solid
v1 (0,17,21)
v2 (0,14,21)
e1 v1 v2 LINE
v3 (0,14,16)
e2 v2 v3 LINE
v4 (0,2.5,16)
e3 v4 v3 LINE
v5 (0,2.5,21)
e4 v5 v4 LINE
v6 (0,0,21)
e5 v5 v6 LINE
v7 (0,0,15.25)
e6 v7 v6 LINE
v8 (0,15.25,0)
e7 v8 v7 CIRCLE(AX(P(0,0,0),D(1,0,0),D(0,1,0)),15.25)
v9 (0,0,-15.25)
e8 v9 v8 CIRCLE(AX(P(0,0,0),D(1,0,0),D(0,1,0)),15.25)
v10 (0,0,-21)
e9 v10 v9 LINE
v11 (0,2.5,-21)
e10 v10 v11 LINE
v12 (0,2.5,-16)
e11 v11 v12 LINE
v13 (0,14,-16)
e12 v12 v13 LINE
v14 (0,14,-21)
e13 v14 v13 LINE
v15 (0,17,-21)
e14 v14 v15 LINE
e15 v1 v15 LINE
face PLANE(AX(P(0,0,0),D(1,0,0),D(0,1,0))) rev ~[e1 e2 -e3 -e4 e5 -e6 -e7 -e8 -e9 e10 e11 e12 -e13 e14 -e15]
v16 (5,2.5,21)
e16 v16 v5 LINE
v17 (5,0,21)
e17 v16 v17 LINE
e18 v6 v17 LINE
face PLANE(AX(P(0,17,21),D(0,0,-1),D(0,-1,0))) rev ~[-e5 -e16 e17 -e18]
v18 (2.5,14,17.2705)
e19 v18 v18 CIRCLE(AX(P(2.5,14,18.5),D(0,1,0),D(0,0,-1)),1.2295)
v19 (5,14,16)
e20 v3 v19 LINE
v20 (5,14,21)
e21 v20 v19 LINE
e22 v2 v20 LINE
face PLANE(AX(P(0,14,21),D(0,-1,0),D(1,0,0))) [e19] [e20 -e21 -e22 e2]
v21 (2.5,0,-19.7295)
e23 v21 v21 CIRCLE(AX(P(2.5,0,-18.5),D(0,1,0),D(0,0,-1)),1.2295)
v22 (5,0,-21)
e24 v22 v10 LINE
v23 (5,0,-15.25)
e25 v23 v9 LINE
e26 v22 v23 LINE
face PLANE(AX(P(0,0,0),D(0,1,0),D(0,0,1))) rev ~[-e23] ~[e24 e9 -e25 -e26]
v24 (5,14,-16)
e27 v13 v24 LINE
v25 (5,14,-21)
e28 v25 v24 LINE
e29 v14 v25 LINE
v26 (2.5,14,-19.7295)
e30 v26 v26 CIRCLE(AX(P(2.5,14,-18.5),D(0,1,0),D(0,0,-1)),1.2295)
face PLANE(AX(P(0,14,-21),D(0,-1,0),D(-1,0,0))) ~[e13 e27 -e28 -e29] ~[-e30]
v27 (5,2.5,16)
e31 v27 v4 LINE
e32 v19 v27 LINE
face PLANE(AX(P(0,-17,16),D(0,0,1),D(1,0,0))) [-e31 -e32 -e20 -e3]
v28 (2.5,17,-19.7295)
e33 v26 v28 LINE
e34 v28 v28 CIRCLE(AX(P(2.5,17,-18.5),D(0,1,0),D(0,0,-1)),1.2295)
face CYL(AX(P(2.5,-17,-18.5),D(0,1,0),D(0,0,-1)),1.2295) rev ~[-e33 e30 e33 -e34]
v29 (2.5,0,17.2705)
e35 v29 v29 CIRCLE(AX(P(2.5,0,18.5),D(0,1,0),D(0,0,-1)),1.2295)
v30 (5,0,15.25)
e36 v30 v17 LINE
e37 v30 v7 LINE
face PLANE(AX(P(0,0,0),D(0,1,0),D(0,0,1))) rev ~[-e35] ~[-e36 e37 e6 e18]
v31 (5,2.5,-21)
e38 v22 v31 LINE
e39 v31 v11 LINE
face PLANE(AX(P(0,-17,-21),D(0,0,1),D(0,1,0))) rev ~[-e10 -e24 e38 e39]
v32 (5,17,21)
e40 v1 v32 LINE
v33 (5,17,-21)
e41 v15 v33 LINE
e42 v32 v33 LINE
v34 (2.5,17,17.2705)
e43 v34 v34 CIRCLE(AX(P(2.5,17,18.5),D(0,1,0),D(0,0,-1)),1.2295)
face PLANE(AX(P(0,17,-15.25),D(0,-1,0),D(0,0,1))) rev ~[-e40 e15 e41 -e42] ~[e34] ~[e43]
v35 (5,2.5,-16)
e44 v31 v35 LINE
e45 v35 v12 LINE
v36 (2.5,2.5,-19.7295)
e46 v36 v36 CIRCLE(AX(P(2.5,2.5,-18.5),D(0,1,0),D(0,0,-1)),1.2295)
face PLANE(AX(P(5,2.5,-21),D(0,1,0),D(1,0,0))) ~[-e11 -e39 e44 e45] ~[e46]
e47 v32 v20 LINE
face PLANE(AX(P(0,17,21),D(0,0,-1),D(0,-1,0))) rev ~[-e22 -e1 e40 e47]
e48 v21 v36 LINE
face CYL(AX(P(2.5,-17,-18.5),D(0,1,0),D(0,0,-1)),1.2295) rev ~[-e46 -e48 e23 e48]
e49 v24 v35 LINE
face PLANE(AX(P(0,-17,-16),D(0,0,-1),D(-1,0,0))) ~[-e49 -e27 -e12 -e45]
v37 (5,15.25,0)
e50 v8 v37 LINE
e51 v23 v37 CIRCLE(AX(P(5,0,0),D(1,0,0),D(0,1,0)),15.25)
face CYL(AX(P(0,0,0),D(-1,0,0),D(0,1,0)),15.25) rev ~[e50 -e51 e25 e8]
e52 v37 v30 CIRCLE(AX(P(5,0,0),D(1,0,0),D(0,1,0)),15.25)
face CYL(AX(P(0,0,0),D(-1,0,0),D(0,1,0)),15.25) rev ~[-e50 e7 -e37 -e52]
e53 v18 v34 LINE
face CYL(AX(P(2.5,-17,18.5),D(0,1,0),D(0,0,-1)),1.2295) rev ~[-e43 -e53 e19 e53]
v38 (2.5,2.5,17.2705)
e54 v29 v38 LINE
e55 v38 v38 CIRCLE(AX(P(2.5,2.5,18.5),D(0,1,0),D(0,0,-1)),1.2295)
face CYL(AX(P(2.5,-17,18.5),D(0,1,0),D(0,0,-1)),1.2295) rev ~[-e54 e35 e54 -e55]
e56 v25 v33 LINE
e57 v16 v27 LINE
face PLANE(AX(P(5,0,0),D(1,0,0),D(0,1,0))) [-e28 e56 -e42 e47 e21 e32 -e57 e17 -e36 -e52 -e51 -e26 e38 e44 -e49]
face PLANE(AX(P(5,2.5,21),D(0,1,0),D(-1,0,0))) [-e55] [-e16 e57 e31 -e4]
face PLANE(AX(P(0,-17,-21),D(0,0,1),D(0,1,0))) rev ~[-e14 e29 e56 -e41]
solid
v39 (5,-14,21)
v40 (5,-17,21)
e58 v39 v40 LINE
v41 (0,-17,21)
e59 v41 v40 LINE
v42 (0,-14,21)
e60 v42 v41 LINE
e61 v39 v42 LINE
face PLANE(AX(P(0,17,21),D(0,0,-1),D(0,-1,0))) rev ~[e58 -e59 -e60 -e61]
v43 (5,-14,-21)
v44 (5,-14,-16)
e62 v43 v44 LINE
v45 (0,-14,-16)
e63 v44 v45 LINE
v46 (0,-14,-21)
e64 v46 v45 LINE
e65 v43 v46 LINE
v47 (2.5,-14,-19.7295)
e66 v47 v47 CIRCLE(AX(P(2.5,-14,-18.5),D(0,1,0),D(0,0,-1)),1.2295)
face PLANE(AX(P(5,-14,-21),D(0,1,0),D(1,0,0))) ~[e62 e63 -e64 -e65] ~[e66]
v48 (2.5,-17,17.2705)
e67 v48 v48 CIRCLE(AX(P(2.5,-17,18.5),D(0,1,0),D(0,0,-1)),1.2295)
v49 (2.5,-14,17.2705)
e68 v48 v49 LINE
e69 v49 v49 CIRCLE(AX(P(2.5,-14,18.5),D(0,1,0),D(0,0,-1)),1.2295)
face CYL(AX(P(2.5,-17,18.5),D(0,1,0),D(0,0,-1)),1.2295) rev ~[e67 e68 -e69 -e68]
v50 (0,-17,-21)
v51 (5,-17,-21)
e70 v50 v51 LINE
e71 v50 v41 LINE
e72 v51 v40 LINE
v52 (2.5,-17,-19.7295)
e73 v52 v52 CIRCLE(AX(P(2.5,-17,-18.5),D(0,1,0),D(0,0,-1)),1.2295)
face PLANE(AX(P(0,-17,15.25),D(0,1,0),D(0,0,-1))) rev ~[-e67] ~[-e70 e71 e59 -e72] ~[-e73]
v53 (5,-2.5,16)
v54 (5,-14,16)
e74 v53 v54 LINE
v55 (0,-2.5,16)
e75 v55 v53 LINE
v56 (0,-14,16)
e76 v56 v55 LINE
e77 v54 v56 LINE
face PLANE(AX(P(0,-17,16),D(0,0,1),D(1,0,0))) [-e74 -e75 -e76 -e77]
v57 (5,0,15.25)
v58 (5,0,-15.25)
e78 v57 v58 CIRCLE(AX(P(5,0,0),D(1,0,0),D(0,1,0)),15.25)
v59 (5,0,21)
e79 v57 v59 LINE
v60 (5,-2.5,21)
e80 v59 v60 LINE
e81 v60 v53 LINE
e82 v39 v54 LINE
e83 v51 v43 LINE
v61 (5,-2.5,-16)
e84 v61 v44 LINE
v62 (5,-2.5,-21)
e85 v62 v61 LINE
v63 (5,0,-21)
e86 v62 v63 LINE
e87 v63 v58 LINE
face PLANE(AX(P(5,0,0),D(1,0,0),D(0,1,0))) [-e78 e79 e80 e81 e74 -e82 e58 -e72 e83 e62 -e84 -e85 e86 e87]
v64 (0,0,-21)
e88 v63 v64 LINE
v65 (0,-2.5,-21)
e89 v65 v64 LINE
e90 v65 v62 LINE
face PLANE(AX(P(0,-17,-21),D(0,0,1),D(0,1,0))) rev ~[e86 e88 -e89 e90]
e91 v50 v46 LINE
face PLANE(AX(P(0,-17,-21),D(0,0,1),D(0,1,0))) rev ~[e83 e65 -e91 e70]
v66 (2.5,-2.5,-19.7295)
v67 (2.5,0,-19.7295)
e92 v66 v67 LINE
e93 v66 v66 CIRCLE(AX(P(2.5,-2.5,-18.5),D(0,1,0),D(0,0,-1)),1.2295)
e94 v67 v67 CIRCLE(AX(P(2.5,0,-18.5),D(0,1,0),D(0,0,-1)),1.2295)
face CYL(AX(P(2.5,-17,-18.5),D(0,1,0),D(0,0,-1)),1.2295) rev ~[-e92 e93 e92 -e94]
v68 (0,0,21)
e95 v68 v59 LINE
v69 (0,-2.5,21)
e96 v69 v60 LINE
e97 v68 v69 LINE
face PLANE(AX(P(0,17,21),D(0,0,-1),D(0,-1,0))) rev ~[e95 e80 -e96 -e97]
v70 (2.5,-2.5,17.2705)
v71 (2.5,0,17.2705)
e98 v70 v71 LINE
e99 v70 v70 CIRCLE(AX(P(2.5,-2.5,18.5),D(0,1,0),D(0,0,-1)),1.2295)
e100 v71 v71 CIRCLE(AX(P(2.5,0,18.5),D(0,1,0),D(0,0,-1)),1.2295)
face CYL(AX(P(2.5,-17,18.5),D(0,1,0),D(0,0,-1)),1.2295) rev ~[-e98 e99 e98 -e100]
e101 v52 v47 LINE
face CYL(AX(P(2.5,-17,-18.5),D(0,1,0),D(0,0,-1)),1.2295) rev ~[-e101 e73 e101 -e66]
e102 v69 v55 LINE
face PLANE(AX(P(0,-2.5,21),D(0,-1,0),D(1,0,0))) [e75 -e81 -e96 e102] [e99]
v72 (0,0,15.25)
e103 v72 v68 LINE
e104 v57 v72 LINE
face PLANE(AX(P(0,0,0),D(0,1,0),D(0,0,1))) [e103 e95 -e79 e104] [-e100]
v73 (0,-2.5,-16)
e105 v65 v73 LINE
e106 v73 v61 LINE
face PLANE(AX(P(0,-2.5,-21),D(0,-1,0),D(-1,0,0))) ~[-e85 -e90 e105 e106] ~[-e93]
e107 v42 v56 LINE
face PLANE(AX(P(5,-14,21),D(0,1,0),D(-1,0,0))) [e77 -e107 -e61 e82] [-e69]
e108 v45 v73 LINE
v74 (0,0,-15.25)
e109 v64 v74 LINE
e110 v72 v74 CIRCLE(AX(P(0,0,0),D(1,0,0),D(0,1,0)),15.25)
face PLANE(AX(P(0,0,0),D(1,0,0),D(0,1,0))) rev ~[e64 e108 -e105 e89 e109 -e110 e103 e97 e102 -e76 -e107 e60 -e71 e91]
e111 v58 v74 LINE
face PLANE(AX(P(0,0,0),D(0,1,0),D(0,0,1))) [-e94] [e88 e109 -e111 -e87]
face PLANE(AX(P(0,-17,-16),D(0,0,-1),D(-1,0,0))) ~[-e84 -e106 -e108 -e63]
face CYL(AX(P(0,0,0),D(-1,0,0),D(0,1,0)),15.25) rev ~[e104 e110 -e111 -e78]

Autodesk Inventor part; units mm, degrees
ref_plane "YZ Plane" through (0, 0, 0) normal (1, 0, 0) x (0, 1, 0)
ref_plane "XZ Plane" through (0, 0, 0) normal (0, 1, 0) x (-1, 0, 0)
ref_plane "XY Plane" through (0, 0, 0) normal (0, 0, 1) x (1, 0, 0)
sketch "Sketch1" plane through (0, 0, 0) normal (1, 0, 0) x (0, 1, 0)
  circle A0 centre (0, 0) radius 15.25
  line L0 (15.25, 15.25) -> (-15.25, 15.25)
  line L1 (-15.25, 15.25) -> (-15.25, -15.25) construction
  line L2 (-15.25, -15.25) -> (15.25, -15.25)
  line L3 (15.25, -15.25) -> (15.25, 15.25) construction
  line L4 (15.25, 15.25) -> (-15.25, -15.25) construction
  line L5 (-15.25, 15.25) -> (15.25, -15.25) construction
  line L6 (17, 21) -> (-17, 21)
  line L7 (-17, 21) -> (-17, -21)
  line L8 (-17, -21) -> (17, -21)
  line L9 (17, -21) -> (17, 21)
  line L10 (17, 21) -> (-17, -21) construction
  line L11 (-17, 21) -> (17, -21) construction
  circle A1 centre (13.25, -13.25) radius 1
  circle A2 centre (13.25, 12.75) radius 1
  circle A3 centre (-12.75, -13.25) radius 1
  circle A4 centre (-12.75, 12.75) radius 1
  line L12 (17, -15.25) -> (15.25, -15.25)
  line L13 (-15.25, -15.25) -> (-17, -15.25)
  line L14 (17, 15.25) -> (15.25, 15.25)
  line L15 (-15.25, 15.25) -> (-17, 15.25)
  point P0 (0, -15.25)
  point P1 (0, 15.25)
  dimension "d0" = 30.5
  dimension "d1" = 42
  dimension "d2" = 34
  dimension "d10" = 2
  dimension "d11" = 2
  dimension "d14" = 26
  dimension "d17" = 26
sketch "Sketch2" plane through (0, 0, 0) normal (0, 1, 0) x (-1, 0, 0)
  line L0 (190, 50) -> (-10, 50)
  line L1 (-10, 50) -> (-10, -50)
  line L2 (-10, -50) -> (190, -50)
  line L3 (190, -50) -> (190, 50)
  point P0 (0, 0)
  point P1 (-10, 0)
  dimension "d3" = 200
  dimension "d4" = 100
  dimension "d5" = 10
extrude "Extrusion1" add sketch "Sketch1" along normal blind 5 contours A0 | A0 L0 L14 L9 L12 L2 | L0 L15 L7 L6 L9 L14 | A0 L2 L13 L7 L15 L0 | L2 L12 L9 L8 L7 L13 | A1 | A2 | A3 | A4
extrude "Extrusion4" [suppressed]
extrude "Extrusion3" cut sketch "Sketch1" along normal blind 5 contours A0
sketch "Sketch3" plane through (0, -17, 21) normal (0, 0, 1) x (1, 0, 0)
  line L0 (0, 0) -> (5, 0) projected
  line L1 (5, 34) -> (5, 0) projected
  line L2 (0.0059, 34.0012) -> (0.0059, 34.0101)
  line L3 (5, 0) -> (5, 34) projected
  line L4 (0, 14.5) -> (5, 14.5)
  line L5 (5, 14.5) -> (5, 3)
  line L6 (5, 3) -> (0, 3)
  line L7 (0, 3) -> (0, 14.5)
  line L8 (0, 31) -> (5, 31)
  line L9 (5, 31) -> (5, 19.5)
  line L10 (5, 19.5) -> (0, 19.5)
  line L11 (0, 19.5) -> (0, 31)
  line L12 (0, 34) -> (5, 34) projected
  line L13 (0, 34) -> (0, 0) projected
  point P0 (0, 17)
  point P1 (5, 3)
  point P2 (0.0059, 34)
  point P3 (0, 17)
  dimension "d26" = 3
  dimension "d27" = 5
  dimension "d43" = 3
  dimension "d44" = 2.5
extrude "Extrusion5" cut sketch "Sketch3" against normal blind 5 contours L7 L4 L1 L6 | L11 L8 L1 L10
mirror "Mirror1" about plane through (0, 0, 0) normal (0, 0, 1) of "Extrusion5"
sketch "Sketch4" plane through (0, -17, -21) normal (0, -1, 0) x (1, 0, 0)
  line L0 (5, 42) -> (5, 0) projected
  line L1 (0, 0) -> (5, 0) projected
  line L2 (0, 42) -> (5, 42) projected
  point P0 (0, 21)
  point P1 (2.5, 39.5)
  point P2 (2.5, 2.5)
  dimension "d39" = 2.5
  dimension "d40" = 2.5
  dimension "d41" = 2.5
  dimension "d42" = 2.5
hole "Hole1" at (2.5, -17, 18.5) at (2.5, -17, -18.5) direction (0, 1, 0) diameter 2.459 end through all thread size "M3x0.5" class "6H" standard "ISO Metric profile"
split body "Split1" result two bodies by plane through (0, 0, 0) normal (0, 1, 0) first body at (0.5, 16.4167, 0)
properties part number "Laser holder2"
